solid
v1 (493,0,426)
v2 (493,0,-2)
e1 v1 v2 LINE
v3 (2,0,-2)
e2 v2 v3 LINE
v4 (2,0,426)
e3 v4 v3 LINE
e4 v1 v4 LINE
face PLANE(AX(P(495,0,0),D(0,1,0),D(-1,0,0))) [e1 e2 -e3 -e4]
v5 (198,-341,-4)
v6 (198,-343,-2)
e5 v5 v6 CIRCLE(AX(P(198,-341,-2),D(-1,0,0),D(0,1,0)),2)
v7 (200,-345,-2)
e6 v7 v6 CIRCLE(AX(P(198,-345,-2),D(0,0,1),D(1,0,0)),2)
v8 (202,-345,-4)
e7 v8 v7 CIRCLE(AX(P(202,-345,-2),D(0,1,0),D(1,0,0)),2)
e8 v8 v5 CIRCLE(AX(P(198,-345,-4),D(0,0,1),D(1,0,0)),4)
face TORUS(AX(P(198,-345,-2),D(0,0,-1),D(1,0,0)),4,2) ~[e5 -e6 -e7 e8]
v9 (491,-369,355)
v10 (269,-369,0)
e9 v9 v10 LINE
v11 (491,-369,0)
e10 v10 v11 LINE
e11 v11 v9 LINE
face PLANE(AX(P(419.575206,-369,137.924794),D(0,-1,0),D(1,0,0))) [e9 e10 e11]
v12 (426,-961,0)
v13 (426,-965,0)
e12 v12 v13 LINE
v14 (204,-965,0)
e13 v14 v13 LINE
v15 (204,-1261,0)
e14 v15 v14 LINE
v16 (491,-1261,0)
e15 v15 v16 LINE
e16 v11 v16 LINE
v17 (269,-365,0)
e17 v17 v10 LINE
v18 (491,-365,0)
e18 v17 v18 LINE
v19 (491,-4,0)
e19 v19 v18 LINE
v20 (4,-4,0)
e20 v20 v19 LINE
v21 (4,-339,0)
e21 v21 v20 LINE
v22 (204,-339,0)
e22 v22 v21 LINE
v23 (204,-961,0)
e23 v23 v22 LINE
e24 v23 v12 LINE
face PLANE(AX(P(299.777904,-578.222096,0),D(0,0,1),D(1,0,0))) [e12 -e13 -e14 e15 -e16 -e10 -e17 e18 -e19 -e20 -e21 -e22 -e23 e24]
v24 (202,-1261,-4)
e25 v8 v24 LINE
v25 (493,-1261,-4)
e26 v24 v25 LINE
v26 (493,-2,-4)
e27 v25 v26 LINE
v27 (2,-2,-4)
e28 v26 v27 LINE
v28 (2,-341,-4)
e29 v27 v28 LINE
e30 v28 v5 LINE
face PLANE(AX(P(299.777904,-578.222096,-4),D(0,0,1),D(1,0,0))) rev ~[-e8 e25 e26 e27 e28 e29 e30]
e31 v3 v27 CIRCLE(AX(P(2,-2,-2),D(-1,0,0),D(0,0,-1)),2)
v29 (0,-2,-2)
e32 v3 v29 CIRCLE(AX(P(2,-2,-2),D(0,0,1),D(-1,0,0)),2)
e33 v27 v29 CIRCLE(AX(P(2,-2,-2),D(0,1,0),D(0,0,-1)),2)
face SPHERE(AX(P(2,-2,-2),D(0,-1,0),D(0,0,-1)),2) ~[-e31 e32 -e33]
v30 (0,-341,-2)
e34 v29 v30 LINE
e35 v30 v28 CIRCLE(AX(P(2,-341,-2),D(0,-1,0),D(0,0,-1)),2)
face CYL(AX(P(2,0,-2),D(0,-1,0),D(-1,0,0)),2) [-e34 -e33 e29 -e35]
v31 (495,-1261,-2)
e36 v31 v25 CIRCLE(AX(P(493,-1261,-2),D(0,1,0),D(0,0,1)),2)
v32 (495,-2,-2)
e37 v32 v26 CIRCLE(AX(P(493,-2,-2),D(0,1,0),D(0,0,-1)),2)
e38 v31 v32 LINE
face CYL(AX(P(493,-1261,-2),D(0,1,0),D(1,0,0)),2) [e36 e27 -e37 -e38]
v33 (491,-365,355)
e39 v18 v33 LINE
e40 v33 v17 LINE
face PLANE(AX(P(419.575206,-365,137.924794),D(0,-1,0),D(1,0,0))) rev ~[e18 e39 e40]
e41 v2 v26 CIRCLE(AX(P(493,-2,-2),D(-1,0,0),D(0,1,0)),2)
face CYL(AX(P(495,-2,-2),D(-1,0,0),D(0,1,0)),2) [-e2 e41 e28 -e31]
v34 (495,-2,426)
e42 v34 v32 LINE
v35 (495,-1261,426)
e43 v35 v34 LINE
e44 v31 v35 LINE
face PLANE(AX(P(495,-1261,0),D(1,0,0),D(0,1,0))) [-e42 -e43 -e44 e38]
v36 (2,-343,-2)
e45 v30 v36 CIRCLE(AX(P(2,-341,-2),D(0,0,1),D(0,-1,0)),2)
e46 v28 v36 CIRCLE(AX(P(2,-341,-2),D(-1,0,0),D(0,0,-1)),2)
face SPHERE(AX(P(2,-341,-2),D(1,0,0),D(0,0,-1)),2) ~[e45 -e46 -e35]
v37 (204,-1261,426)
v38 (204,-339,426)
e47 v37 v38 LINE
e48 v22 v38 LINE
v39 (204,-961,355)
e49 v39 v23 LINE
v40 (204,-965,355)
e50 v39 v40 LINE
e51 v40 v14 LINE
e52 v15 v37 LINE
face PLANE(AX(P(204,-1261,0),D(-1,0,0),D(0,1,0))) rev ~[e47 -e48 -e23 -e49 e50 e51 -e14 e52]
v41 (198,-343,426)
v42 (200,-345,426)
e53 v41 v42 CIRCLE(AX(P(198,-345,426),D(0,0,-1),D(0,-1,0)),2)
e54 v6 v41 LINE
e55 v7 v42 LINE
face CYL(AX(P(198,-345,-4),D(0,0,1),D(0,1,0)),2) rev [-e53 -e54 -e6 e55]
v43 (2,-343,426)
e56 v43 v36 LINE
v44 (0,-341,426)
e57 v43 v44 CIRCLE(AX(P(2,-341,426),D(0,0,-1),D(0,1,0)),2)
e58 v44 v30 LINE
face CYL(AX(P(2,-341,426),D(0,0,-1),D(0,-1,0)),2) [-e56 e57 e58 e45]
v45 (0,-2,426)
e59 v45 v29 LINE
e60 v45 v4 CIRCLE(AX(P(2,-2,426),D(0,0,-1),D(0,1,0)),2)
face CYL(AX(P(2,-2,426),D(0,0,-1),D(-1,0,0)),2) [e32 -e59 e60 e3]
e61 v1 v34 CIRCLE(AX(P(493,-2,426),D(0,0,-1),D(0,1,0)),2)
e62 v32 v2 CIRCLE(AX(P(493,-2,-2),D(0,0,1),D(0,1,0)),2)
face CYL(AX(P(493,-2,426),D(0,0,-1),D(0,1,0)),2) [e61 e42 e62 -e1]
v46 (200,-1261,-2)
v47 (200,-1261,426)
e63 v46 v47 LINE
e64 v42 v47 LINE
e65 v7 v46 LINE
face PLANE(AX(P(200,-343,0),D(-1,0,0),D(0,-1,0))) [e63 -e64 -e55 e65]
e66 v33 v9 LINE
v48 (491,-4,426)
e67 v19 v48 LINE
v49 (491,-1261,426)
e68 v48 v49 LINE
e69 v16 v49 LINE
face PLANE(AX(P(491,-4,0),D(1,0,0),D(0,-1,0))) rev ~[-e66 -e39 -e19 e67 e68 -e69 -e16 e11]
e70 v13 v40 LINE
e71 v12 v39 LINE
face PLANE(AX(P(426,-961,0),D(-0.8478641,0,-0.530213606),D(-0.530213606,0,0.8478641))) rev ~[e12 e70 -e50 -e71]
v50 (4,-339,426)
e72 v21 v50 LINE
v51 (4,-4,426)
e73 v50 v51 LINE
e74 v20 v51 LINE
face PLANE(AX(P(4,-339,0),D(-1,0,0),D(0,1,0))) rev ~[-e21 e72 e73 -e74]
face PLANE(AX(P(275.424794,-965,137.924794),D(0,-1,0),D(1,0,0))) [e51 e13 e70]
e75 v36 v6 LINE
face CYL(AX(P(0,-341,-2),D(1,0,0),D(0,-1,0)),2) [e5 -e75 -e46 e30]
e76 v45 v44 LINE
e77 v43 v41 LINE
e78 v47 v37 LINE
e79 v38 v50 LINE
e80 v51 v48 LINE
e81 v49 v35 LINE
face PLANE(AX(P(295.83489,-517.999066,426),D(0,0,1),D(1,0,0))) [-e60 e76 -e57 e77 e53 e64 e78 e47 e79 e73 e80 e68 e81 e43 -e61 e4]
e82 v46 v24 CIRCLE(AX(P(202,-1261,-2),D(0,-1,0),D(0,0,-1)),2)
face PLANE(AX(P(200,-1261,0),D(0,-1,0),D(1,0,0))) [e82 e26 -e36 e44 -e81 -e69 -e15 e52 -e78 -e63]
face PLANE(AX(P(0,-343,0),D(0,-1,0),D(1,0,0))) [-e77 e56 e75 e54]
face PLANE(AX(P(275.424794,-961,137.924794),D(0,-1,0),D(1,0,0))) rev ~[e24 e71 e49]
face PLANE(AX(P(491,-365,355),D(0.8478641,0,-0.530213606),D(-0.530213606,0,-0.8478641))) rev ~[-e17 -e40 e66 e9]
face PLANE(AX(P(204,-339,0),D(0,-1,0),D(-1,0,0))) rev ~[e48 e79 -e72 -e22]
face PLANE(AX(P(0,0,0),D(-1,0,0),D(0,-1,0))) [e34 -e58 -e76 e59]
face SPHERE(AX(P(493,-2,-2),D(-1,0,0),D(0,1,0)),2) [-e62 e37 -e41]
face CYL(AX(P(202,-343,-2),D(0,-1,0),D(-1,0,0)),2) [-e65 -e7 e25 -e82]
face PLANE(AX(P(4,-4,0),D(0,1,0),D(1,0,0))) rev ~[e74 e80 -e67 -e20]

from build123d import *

# Parameters (mm, degrees)
F1_DEPTH  = 426
F3_DEPTH  = 4
F4_R      = 2
F7_DEPTH  = 4
F10_DEPTH = 4


# Not quite as in the source:
# - a feature names something its author has since deleted; it is built from what else it names


with BuildPart() as f1:
    # F0 (on Top) → F1 (new body)
    with BuildSketch(Plane.XY):
        Polygon((495, 0), (0, 0), (0, -343), (200, -343), (200, -1261), (204, -1261), (204, -339), (4, -339), (4, -4), (491, -4), (491, -1261), (495, -1261), align=None)
    extrude(amount=F1_DEPTH)

    # F2 (on Top) → F3 (join)
    with BuildSketch(Plane.XY):
        Polygon((0, -343), (200, -343), (200, -1261), (495, -1261), (495, 0), (0, 0), align=None)
    extrude(amount=-F3_DEPTH)

    # F4
    f4_edges = [f1.edges().sort_by_distance(p)[0] for p in [
        (100, -343, -4),
        (0, -171.5, -4),
        (247.5, 0, -4),
        (200, -343, 211),
        (0, -343, 211),
        (0, 0, 211),
        (495, 0, 211),
        (200, -802, -4),
        (495, -630.5, -4),
    ]]
    fillet(f4_edges, radius=F4_R)

    # F6 (on offset) → F7 (join)
    with BuildSketch(Plane.XZ.offset(961)):
        Polygon((204, 355), (204, 0), (426, 0), align=None)
    extrude(amount=F7_DEPTH)

    # F9 (on offset) → F10 (join)
    with BuildSketch(Plane.XZ.offset(365)):
        Polygon((269, 0), (491, 0), (491, 355), align=None)
    extrude(amount=F10_DEPTH)


solid = f1.part
